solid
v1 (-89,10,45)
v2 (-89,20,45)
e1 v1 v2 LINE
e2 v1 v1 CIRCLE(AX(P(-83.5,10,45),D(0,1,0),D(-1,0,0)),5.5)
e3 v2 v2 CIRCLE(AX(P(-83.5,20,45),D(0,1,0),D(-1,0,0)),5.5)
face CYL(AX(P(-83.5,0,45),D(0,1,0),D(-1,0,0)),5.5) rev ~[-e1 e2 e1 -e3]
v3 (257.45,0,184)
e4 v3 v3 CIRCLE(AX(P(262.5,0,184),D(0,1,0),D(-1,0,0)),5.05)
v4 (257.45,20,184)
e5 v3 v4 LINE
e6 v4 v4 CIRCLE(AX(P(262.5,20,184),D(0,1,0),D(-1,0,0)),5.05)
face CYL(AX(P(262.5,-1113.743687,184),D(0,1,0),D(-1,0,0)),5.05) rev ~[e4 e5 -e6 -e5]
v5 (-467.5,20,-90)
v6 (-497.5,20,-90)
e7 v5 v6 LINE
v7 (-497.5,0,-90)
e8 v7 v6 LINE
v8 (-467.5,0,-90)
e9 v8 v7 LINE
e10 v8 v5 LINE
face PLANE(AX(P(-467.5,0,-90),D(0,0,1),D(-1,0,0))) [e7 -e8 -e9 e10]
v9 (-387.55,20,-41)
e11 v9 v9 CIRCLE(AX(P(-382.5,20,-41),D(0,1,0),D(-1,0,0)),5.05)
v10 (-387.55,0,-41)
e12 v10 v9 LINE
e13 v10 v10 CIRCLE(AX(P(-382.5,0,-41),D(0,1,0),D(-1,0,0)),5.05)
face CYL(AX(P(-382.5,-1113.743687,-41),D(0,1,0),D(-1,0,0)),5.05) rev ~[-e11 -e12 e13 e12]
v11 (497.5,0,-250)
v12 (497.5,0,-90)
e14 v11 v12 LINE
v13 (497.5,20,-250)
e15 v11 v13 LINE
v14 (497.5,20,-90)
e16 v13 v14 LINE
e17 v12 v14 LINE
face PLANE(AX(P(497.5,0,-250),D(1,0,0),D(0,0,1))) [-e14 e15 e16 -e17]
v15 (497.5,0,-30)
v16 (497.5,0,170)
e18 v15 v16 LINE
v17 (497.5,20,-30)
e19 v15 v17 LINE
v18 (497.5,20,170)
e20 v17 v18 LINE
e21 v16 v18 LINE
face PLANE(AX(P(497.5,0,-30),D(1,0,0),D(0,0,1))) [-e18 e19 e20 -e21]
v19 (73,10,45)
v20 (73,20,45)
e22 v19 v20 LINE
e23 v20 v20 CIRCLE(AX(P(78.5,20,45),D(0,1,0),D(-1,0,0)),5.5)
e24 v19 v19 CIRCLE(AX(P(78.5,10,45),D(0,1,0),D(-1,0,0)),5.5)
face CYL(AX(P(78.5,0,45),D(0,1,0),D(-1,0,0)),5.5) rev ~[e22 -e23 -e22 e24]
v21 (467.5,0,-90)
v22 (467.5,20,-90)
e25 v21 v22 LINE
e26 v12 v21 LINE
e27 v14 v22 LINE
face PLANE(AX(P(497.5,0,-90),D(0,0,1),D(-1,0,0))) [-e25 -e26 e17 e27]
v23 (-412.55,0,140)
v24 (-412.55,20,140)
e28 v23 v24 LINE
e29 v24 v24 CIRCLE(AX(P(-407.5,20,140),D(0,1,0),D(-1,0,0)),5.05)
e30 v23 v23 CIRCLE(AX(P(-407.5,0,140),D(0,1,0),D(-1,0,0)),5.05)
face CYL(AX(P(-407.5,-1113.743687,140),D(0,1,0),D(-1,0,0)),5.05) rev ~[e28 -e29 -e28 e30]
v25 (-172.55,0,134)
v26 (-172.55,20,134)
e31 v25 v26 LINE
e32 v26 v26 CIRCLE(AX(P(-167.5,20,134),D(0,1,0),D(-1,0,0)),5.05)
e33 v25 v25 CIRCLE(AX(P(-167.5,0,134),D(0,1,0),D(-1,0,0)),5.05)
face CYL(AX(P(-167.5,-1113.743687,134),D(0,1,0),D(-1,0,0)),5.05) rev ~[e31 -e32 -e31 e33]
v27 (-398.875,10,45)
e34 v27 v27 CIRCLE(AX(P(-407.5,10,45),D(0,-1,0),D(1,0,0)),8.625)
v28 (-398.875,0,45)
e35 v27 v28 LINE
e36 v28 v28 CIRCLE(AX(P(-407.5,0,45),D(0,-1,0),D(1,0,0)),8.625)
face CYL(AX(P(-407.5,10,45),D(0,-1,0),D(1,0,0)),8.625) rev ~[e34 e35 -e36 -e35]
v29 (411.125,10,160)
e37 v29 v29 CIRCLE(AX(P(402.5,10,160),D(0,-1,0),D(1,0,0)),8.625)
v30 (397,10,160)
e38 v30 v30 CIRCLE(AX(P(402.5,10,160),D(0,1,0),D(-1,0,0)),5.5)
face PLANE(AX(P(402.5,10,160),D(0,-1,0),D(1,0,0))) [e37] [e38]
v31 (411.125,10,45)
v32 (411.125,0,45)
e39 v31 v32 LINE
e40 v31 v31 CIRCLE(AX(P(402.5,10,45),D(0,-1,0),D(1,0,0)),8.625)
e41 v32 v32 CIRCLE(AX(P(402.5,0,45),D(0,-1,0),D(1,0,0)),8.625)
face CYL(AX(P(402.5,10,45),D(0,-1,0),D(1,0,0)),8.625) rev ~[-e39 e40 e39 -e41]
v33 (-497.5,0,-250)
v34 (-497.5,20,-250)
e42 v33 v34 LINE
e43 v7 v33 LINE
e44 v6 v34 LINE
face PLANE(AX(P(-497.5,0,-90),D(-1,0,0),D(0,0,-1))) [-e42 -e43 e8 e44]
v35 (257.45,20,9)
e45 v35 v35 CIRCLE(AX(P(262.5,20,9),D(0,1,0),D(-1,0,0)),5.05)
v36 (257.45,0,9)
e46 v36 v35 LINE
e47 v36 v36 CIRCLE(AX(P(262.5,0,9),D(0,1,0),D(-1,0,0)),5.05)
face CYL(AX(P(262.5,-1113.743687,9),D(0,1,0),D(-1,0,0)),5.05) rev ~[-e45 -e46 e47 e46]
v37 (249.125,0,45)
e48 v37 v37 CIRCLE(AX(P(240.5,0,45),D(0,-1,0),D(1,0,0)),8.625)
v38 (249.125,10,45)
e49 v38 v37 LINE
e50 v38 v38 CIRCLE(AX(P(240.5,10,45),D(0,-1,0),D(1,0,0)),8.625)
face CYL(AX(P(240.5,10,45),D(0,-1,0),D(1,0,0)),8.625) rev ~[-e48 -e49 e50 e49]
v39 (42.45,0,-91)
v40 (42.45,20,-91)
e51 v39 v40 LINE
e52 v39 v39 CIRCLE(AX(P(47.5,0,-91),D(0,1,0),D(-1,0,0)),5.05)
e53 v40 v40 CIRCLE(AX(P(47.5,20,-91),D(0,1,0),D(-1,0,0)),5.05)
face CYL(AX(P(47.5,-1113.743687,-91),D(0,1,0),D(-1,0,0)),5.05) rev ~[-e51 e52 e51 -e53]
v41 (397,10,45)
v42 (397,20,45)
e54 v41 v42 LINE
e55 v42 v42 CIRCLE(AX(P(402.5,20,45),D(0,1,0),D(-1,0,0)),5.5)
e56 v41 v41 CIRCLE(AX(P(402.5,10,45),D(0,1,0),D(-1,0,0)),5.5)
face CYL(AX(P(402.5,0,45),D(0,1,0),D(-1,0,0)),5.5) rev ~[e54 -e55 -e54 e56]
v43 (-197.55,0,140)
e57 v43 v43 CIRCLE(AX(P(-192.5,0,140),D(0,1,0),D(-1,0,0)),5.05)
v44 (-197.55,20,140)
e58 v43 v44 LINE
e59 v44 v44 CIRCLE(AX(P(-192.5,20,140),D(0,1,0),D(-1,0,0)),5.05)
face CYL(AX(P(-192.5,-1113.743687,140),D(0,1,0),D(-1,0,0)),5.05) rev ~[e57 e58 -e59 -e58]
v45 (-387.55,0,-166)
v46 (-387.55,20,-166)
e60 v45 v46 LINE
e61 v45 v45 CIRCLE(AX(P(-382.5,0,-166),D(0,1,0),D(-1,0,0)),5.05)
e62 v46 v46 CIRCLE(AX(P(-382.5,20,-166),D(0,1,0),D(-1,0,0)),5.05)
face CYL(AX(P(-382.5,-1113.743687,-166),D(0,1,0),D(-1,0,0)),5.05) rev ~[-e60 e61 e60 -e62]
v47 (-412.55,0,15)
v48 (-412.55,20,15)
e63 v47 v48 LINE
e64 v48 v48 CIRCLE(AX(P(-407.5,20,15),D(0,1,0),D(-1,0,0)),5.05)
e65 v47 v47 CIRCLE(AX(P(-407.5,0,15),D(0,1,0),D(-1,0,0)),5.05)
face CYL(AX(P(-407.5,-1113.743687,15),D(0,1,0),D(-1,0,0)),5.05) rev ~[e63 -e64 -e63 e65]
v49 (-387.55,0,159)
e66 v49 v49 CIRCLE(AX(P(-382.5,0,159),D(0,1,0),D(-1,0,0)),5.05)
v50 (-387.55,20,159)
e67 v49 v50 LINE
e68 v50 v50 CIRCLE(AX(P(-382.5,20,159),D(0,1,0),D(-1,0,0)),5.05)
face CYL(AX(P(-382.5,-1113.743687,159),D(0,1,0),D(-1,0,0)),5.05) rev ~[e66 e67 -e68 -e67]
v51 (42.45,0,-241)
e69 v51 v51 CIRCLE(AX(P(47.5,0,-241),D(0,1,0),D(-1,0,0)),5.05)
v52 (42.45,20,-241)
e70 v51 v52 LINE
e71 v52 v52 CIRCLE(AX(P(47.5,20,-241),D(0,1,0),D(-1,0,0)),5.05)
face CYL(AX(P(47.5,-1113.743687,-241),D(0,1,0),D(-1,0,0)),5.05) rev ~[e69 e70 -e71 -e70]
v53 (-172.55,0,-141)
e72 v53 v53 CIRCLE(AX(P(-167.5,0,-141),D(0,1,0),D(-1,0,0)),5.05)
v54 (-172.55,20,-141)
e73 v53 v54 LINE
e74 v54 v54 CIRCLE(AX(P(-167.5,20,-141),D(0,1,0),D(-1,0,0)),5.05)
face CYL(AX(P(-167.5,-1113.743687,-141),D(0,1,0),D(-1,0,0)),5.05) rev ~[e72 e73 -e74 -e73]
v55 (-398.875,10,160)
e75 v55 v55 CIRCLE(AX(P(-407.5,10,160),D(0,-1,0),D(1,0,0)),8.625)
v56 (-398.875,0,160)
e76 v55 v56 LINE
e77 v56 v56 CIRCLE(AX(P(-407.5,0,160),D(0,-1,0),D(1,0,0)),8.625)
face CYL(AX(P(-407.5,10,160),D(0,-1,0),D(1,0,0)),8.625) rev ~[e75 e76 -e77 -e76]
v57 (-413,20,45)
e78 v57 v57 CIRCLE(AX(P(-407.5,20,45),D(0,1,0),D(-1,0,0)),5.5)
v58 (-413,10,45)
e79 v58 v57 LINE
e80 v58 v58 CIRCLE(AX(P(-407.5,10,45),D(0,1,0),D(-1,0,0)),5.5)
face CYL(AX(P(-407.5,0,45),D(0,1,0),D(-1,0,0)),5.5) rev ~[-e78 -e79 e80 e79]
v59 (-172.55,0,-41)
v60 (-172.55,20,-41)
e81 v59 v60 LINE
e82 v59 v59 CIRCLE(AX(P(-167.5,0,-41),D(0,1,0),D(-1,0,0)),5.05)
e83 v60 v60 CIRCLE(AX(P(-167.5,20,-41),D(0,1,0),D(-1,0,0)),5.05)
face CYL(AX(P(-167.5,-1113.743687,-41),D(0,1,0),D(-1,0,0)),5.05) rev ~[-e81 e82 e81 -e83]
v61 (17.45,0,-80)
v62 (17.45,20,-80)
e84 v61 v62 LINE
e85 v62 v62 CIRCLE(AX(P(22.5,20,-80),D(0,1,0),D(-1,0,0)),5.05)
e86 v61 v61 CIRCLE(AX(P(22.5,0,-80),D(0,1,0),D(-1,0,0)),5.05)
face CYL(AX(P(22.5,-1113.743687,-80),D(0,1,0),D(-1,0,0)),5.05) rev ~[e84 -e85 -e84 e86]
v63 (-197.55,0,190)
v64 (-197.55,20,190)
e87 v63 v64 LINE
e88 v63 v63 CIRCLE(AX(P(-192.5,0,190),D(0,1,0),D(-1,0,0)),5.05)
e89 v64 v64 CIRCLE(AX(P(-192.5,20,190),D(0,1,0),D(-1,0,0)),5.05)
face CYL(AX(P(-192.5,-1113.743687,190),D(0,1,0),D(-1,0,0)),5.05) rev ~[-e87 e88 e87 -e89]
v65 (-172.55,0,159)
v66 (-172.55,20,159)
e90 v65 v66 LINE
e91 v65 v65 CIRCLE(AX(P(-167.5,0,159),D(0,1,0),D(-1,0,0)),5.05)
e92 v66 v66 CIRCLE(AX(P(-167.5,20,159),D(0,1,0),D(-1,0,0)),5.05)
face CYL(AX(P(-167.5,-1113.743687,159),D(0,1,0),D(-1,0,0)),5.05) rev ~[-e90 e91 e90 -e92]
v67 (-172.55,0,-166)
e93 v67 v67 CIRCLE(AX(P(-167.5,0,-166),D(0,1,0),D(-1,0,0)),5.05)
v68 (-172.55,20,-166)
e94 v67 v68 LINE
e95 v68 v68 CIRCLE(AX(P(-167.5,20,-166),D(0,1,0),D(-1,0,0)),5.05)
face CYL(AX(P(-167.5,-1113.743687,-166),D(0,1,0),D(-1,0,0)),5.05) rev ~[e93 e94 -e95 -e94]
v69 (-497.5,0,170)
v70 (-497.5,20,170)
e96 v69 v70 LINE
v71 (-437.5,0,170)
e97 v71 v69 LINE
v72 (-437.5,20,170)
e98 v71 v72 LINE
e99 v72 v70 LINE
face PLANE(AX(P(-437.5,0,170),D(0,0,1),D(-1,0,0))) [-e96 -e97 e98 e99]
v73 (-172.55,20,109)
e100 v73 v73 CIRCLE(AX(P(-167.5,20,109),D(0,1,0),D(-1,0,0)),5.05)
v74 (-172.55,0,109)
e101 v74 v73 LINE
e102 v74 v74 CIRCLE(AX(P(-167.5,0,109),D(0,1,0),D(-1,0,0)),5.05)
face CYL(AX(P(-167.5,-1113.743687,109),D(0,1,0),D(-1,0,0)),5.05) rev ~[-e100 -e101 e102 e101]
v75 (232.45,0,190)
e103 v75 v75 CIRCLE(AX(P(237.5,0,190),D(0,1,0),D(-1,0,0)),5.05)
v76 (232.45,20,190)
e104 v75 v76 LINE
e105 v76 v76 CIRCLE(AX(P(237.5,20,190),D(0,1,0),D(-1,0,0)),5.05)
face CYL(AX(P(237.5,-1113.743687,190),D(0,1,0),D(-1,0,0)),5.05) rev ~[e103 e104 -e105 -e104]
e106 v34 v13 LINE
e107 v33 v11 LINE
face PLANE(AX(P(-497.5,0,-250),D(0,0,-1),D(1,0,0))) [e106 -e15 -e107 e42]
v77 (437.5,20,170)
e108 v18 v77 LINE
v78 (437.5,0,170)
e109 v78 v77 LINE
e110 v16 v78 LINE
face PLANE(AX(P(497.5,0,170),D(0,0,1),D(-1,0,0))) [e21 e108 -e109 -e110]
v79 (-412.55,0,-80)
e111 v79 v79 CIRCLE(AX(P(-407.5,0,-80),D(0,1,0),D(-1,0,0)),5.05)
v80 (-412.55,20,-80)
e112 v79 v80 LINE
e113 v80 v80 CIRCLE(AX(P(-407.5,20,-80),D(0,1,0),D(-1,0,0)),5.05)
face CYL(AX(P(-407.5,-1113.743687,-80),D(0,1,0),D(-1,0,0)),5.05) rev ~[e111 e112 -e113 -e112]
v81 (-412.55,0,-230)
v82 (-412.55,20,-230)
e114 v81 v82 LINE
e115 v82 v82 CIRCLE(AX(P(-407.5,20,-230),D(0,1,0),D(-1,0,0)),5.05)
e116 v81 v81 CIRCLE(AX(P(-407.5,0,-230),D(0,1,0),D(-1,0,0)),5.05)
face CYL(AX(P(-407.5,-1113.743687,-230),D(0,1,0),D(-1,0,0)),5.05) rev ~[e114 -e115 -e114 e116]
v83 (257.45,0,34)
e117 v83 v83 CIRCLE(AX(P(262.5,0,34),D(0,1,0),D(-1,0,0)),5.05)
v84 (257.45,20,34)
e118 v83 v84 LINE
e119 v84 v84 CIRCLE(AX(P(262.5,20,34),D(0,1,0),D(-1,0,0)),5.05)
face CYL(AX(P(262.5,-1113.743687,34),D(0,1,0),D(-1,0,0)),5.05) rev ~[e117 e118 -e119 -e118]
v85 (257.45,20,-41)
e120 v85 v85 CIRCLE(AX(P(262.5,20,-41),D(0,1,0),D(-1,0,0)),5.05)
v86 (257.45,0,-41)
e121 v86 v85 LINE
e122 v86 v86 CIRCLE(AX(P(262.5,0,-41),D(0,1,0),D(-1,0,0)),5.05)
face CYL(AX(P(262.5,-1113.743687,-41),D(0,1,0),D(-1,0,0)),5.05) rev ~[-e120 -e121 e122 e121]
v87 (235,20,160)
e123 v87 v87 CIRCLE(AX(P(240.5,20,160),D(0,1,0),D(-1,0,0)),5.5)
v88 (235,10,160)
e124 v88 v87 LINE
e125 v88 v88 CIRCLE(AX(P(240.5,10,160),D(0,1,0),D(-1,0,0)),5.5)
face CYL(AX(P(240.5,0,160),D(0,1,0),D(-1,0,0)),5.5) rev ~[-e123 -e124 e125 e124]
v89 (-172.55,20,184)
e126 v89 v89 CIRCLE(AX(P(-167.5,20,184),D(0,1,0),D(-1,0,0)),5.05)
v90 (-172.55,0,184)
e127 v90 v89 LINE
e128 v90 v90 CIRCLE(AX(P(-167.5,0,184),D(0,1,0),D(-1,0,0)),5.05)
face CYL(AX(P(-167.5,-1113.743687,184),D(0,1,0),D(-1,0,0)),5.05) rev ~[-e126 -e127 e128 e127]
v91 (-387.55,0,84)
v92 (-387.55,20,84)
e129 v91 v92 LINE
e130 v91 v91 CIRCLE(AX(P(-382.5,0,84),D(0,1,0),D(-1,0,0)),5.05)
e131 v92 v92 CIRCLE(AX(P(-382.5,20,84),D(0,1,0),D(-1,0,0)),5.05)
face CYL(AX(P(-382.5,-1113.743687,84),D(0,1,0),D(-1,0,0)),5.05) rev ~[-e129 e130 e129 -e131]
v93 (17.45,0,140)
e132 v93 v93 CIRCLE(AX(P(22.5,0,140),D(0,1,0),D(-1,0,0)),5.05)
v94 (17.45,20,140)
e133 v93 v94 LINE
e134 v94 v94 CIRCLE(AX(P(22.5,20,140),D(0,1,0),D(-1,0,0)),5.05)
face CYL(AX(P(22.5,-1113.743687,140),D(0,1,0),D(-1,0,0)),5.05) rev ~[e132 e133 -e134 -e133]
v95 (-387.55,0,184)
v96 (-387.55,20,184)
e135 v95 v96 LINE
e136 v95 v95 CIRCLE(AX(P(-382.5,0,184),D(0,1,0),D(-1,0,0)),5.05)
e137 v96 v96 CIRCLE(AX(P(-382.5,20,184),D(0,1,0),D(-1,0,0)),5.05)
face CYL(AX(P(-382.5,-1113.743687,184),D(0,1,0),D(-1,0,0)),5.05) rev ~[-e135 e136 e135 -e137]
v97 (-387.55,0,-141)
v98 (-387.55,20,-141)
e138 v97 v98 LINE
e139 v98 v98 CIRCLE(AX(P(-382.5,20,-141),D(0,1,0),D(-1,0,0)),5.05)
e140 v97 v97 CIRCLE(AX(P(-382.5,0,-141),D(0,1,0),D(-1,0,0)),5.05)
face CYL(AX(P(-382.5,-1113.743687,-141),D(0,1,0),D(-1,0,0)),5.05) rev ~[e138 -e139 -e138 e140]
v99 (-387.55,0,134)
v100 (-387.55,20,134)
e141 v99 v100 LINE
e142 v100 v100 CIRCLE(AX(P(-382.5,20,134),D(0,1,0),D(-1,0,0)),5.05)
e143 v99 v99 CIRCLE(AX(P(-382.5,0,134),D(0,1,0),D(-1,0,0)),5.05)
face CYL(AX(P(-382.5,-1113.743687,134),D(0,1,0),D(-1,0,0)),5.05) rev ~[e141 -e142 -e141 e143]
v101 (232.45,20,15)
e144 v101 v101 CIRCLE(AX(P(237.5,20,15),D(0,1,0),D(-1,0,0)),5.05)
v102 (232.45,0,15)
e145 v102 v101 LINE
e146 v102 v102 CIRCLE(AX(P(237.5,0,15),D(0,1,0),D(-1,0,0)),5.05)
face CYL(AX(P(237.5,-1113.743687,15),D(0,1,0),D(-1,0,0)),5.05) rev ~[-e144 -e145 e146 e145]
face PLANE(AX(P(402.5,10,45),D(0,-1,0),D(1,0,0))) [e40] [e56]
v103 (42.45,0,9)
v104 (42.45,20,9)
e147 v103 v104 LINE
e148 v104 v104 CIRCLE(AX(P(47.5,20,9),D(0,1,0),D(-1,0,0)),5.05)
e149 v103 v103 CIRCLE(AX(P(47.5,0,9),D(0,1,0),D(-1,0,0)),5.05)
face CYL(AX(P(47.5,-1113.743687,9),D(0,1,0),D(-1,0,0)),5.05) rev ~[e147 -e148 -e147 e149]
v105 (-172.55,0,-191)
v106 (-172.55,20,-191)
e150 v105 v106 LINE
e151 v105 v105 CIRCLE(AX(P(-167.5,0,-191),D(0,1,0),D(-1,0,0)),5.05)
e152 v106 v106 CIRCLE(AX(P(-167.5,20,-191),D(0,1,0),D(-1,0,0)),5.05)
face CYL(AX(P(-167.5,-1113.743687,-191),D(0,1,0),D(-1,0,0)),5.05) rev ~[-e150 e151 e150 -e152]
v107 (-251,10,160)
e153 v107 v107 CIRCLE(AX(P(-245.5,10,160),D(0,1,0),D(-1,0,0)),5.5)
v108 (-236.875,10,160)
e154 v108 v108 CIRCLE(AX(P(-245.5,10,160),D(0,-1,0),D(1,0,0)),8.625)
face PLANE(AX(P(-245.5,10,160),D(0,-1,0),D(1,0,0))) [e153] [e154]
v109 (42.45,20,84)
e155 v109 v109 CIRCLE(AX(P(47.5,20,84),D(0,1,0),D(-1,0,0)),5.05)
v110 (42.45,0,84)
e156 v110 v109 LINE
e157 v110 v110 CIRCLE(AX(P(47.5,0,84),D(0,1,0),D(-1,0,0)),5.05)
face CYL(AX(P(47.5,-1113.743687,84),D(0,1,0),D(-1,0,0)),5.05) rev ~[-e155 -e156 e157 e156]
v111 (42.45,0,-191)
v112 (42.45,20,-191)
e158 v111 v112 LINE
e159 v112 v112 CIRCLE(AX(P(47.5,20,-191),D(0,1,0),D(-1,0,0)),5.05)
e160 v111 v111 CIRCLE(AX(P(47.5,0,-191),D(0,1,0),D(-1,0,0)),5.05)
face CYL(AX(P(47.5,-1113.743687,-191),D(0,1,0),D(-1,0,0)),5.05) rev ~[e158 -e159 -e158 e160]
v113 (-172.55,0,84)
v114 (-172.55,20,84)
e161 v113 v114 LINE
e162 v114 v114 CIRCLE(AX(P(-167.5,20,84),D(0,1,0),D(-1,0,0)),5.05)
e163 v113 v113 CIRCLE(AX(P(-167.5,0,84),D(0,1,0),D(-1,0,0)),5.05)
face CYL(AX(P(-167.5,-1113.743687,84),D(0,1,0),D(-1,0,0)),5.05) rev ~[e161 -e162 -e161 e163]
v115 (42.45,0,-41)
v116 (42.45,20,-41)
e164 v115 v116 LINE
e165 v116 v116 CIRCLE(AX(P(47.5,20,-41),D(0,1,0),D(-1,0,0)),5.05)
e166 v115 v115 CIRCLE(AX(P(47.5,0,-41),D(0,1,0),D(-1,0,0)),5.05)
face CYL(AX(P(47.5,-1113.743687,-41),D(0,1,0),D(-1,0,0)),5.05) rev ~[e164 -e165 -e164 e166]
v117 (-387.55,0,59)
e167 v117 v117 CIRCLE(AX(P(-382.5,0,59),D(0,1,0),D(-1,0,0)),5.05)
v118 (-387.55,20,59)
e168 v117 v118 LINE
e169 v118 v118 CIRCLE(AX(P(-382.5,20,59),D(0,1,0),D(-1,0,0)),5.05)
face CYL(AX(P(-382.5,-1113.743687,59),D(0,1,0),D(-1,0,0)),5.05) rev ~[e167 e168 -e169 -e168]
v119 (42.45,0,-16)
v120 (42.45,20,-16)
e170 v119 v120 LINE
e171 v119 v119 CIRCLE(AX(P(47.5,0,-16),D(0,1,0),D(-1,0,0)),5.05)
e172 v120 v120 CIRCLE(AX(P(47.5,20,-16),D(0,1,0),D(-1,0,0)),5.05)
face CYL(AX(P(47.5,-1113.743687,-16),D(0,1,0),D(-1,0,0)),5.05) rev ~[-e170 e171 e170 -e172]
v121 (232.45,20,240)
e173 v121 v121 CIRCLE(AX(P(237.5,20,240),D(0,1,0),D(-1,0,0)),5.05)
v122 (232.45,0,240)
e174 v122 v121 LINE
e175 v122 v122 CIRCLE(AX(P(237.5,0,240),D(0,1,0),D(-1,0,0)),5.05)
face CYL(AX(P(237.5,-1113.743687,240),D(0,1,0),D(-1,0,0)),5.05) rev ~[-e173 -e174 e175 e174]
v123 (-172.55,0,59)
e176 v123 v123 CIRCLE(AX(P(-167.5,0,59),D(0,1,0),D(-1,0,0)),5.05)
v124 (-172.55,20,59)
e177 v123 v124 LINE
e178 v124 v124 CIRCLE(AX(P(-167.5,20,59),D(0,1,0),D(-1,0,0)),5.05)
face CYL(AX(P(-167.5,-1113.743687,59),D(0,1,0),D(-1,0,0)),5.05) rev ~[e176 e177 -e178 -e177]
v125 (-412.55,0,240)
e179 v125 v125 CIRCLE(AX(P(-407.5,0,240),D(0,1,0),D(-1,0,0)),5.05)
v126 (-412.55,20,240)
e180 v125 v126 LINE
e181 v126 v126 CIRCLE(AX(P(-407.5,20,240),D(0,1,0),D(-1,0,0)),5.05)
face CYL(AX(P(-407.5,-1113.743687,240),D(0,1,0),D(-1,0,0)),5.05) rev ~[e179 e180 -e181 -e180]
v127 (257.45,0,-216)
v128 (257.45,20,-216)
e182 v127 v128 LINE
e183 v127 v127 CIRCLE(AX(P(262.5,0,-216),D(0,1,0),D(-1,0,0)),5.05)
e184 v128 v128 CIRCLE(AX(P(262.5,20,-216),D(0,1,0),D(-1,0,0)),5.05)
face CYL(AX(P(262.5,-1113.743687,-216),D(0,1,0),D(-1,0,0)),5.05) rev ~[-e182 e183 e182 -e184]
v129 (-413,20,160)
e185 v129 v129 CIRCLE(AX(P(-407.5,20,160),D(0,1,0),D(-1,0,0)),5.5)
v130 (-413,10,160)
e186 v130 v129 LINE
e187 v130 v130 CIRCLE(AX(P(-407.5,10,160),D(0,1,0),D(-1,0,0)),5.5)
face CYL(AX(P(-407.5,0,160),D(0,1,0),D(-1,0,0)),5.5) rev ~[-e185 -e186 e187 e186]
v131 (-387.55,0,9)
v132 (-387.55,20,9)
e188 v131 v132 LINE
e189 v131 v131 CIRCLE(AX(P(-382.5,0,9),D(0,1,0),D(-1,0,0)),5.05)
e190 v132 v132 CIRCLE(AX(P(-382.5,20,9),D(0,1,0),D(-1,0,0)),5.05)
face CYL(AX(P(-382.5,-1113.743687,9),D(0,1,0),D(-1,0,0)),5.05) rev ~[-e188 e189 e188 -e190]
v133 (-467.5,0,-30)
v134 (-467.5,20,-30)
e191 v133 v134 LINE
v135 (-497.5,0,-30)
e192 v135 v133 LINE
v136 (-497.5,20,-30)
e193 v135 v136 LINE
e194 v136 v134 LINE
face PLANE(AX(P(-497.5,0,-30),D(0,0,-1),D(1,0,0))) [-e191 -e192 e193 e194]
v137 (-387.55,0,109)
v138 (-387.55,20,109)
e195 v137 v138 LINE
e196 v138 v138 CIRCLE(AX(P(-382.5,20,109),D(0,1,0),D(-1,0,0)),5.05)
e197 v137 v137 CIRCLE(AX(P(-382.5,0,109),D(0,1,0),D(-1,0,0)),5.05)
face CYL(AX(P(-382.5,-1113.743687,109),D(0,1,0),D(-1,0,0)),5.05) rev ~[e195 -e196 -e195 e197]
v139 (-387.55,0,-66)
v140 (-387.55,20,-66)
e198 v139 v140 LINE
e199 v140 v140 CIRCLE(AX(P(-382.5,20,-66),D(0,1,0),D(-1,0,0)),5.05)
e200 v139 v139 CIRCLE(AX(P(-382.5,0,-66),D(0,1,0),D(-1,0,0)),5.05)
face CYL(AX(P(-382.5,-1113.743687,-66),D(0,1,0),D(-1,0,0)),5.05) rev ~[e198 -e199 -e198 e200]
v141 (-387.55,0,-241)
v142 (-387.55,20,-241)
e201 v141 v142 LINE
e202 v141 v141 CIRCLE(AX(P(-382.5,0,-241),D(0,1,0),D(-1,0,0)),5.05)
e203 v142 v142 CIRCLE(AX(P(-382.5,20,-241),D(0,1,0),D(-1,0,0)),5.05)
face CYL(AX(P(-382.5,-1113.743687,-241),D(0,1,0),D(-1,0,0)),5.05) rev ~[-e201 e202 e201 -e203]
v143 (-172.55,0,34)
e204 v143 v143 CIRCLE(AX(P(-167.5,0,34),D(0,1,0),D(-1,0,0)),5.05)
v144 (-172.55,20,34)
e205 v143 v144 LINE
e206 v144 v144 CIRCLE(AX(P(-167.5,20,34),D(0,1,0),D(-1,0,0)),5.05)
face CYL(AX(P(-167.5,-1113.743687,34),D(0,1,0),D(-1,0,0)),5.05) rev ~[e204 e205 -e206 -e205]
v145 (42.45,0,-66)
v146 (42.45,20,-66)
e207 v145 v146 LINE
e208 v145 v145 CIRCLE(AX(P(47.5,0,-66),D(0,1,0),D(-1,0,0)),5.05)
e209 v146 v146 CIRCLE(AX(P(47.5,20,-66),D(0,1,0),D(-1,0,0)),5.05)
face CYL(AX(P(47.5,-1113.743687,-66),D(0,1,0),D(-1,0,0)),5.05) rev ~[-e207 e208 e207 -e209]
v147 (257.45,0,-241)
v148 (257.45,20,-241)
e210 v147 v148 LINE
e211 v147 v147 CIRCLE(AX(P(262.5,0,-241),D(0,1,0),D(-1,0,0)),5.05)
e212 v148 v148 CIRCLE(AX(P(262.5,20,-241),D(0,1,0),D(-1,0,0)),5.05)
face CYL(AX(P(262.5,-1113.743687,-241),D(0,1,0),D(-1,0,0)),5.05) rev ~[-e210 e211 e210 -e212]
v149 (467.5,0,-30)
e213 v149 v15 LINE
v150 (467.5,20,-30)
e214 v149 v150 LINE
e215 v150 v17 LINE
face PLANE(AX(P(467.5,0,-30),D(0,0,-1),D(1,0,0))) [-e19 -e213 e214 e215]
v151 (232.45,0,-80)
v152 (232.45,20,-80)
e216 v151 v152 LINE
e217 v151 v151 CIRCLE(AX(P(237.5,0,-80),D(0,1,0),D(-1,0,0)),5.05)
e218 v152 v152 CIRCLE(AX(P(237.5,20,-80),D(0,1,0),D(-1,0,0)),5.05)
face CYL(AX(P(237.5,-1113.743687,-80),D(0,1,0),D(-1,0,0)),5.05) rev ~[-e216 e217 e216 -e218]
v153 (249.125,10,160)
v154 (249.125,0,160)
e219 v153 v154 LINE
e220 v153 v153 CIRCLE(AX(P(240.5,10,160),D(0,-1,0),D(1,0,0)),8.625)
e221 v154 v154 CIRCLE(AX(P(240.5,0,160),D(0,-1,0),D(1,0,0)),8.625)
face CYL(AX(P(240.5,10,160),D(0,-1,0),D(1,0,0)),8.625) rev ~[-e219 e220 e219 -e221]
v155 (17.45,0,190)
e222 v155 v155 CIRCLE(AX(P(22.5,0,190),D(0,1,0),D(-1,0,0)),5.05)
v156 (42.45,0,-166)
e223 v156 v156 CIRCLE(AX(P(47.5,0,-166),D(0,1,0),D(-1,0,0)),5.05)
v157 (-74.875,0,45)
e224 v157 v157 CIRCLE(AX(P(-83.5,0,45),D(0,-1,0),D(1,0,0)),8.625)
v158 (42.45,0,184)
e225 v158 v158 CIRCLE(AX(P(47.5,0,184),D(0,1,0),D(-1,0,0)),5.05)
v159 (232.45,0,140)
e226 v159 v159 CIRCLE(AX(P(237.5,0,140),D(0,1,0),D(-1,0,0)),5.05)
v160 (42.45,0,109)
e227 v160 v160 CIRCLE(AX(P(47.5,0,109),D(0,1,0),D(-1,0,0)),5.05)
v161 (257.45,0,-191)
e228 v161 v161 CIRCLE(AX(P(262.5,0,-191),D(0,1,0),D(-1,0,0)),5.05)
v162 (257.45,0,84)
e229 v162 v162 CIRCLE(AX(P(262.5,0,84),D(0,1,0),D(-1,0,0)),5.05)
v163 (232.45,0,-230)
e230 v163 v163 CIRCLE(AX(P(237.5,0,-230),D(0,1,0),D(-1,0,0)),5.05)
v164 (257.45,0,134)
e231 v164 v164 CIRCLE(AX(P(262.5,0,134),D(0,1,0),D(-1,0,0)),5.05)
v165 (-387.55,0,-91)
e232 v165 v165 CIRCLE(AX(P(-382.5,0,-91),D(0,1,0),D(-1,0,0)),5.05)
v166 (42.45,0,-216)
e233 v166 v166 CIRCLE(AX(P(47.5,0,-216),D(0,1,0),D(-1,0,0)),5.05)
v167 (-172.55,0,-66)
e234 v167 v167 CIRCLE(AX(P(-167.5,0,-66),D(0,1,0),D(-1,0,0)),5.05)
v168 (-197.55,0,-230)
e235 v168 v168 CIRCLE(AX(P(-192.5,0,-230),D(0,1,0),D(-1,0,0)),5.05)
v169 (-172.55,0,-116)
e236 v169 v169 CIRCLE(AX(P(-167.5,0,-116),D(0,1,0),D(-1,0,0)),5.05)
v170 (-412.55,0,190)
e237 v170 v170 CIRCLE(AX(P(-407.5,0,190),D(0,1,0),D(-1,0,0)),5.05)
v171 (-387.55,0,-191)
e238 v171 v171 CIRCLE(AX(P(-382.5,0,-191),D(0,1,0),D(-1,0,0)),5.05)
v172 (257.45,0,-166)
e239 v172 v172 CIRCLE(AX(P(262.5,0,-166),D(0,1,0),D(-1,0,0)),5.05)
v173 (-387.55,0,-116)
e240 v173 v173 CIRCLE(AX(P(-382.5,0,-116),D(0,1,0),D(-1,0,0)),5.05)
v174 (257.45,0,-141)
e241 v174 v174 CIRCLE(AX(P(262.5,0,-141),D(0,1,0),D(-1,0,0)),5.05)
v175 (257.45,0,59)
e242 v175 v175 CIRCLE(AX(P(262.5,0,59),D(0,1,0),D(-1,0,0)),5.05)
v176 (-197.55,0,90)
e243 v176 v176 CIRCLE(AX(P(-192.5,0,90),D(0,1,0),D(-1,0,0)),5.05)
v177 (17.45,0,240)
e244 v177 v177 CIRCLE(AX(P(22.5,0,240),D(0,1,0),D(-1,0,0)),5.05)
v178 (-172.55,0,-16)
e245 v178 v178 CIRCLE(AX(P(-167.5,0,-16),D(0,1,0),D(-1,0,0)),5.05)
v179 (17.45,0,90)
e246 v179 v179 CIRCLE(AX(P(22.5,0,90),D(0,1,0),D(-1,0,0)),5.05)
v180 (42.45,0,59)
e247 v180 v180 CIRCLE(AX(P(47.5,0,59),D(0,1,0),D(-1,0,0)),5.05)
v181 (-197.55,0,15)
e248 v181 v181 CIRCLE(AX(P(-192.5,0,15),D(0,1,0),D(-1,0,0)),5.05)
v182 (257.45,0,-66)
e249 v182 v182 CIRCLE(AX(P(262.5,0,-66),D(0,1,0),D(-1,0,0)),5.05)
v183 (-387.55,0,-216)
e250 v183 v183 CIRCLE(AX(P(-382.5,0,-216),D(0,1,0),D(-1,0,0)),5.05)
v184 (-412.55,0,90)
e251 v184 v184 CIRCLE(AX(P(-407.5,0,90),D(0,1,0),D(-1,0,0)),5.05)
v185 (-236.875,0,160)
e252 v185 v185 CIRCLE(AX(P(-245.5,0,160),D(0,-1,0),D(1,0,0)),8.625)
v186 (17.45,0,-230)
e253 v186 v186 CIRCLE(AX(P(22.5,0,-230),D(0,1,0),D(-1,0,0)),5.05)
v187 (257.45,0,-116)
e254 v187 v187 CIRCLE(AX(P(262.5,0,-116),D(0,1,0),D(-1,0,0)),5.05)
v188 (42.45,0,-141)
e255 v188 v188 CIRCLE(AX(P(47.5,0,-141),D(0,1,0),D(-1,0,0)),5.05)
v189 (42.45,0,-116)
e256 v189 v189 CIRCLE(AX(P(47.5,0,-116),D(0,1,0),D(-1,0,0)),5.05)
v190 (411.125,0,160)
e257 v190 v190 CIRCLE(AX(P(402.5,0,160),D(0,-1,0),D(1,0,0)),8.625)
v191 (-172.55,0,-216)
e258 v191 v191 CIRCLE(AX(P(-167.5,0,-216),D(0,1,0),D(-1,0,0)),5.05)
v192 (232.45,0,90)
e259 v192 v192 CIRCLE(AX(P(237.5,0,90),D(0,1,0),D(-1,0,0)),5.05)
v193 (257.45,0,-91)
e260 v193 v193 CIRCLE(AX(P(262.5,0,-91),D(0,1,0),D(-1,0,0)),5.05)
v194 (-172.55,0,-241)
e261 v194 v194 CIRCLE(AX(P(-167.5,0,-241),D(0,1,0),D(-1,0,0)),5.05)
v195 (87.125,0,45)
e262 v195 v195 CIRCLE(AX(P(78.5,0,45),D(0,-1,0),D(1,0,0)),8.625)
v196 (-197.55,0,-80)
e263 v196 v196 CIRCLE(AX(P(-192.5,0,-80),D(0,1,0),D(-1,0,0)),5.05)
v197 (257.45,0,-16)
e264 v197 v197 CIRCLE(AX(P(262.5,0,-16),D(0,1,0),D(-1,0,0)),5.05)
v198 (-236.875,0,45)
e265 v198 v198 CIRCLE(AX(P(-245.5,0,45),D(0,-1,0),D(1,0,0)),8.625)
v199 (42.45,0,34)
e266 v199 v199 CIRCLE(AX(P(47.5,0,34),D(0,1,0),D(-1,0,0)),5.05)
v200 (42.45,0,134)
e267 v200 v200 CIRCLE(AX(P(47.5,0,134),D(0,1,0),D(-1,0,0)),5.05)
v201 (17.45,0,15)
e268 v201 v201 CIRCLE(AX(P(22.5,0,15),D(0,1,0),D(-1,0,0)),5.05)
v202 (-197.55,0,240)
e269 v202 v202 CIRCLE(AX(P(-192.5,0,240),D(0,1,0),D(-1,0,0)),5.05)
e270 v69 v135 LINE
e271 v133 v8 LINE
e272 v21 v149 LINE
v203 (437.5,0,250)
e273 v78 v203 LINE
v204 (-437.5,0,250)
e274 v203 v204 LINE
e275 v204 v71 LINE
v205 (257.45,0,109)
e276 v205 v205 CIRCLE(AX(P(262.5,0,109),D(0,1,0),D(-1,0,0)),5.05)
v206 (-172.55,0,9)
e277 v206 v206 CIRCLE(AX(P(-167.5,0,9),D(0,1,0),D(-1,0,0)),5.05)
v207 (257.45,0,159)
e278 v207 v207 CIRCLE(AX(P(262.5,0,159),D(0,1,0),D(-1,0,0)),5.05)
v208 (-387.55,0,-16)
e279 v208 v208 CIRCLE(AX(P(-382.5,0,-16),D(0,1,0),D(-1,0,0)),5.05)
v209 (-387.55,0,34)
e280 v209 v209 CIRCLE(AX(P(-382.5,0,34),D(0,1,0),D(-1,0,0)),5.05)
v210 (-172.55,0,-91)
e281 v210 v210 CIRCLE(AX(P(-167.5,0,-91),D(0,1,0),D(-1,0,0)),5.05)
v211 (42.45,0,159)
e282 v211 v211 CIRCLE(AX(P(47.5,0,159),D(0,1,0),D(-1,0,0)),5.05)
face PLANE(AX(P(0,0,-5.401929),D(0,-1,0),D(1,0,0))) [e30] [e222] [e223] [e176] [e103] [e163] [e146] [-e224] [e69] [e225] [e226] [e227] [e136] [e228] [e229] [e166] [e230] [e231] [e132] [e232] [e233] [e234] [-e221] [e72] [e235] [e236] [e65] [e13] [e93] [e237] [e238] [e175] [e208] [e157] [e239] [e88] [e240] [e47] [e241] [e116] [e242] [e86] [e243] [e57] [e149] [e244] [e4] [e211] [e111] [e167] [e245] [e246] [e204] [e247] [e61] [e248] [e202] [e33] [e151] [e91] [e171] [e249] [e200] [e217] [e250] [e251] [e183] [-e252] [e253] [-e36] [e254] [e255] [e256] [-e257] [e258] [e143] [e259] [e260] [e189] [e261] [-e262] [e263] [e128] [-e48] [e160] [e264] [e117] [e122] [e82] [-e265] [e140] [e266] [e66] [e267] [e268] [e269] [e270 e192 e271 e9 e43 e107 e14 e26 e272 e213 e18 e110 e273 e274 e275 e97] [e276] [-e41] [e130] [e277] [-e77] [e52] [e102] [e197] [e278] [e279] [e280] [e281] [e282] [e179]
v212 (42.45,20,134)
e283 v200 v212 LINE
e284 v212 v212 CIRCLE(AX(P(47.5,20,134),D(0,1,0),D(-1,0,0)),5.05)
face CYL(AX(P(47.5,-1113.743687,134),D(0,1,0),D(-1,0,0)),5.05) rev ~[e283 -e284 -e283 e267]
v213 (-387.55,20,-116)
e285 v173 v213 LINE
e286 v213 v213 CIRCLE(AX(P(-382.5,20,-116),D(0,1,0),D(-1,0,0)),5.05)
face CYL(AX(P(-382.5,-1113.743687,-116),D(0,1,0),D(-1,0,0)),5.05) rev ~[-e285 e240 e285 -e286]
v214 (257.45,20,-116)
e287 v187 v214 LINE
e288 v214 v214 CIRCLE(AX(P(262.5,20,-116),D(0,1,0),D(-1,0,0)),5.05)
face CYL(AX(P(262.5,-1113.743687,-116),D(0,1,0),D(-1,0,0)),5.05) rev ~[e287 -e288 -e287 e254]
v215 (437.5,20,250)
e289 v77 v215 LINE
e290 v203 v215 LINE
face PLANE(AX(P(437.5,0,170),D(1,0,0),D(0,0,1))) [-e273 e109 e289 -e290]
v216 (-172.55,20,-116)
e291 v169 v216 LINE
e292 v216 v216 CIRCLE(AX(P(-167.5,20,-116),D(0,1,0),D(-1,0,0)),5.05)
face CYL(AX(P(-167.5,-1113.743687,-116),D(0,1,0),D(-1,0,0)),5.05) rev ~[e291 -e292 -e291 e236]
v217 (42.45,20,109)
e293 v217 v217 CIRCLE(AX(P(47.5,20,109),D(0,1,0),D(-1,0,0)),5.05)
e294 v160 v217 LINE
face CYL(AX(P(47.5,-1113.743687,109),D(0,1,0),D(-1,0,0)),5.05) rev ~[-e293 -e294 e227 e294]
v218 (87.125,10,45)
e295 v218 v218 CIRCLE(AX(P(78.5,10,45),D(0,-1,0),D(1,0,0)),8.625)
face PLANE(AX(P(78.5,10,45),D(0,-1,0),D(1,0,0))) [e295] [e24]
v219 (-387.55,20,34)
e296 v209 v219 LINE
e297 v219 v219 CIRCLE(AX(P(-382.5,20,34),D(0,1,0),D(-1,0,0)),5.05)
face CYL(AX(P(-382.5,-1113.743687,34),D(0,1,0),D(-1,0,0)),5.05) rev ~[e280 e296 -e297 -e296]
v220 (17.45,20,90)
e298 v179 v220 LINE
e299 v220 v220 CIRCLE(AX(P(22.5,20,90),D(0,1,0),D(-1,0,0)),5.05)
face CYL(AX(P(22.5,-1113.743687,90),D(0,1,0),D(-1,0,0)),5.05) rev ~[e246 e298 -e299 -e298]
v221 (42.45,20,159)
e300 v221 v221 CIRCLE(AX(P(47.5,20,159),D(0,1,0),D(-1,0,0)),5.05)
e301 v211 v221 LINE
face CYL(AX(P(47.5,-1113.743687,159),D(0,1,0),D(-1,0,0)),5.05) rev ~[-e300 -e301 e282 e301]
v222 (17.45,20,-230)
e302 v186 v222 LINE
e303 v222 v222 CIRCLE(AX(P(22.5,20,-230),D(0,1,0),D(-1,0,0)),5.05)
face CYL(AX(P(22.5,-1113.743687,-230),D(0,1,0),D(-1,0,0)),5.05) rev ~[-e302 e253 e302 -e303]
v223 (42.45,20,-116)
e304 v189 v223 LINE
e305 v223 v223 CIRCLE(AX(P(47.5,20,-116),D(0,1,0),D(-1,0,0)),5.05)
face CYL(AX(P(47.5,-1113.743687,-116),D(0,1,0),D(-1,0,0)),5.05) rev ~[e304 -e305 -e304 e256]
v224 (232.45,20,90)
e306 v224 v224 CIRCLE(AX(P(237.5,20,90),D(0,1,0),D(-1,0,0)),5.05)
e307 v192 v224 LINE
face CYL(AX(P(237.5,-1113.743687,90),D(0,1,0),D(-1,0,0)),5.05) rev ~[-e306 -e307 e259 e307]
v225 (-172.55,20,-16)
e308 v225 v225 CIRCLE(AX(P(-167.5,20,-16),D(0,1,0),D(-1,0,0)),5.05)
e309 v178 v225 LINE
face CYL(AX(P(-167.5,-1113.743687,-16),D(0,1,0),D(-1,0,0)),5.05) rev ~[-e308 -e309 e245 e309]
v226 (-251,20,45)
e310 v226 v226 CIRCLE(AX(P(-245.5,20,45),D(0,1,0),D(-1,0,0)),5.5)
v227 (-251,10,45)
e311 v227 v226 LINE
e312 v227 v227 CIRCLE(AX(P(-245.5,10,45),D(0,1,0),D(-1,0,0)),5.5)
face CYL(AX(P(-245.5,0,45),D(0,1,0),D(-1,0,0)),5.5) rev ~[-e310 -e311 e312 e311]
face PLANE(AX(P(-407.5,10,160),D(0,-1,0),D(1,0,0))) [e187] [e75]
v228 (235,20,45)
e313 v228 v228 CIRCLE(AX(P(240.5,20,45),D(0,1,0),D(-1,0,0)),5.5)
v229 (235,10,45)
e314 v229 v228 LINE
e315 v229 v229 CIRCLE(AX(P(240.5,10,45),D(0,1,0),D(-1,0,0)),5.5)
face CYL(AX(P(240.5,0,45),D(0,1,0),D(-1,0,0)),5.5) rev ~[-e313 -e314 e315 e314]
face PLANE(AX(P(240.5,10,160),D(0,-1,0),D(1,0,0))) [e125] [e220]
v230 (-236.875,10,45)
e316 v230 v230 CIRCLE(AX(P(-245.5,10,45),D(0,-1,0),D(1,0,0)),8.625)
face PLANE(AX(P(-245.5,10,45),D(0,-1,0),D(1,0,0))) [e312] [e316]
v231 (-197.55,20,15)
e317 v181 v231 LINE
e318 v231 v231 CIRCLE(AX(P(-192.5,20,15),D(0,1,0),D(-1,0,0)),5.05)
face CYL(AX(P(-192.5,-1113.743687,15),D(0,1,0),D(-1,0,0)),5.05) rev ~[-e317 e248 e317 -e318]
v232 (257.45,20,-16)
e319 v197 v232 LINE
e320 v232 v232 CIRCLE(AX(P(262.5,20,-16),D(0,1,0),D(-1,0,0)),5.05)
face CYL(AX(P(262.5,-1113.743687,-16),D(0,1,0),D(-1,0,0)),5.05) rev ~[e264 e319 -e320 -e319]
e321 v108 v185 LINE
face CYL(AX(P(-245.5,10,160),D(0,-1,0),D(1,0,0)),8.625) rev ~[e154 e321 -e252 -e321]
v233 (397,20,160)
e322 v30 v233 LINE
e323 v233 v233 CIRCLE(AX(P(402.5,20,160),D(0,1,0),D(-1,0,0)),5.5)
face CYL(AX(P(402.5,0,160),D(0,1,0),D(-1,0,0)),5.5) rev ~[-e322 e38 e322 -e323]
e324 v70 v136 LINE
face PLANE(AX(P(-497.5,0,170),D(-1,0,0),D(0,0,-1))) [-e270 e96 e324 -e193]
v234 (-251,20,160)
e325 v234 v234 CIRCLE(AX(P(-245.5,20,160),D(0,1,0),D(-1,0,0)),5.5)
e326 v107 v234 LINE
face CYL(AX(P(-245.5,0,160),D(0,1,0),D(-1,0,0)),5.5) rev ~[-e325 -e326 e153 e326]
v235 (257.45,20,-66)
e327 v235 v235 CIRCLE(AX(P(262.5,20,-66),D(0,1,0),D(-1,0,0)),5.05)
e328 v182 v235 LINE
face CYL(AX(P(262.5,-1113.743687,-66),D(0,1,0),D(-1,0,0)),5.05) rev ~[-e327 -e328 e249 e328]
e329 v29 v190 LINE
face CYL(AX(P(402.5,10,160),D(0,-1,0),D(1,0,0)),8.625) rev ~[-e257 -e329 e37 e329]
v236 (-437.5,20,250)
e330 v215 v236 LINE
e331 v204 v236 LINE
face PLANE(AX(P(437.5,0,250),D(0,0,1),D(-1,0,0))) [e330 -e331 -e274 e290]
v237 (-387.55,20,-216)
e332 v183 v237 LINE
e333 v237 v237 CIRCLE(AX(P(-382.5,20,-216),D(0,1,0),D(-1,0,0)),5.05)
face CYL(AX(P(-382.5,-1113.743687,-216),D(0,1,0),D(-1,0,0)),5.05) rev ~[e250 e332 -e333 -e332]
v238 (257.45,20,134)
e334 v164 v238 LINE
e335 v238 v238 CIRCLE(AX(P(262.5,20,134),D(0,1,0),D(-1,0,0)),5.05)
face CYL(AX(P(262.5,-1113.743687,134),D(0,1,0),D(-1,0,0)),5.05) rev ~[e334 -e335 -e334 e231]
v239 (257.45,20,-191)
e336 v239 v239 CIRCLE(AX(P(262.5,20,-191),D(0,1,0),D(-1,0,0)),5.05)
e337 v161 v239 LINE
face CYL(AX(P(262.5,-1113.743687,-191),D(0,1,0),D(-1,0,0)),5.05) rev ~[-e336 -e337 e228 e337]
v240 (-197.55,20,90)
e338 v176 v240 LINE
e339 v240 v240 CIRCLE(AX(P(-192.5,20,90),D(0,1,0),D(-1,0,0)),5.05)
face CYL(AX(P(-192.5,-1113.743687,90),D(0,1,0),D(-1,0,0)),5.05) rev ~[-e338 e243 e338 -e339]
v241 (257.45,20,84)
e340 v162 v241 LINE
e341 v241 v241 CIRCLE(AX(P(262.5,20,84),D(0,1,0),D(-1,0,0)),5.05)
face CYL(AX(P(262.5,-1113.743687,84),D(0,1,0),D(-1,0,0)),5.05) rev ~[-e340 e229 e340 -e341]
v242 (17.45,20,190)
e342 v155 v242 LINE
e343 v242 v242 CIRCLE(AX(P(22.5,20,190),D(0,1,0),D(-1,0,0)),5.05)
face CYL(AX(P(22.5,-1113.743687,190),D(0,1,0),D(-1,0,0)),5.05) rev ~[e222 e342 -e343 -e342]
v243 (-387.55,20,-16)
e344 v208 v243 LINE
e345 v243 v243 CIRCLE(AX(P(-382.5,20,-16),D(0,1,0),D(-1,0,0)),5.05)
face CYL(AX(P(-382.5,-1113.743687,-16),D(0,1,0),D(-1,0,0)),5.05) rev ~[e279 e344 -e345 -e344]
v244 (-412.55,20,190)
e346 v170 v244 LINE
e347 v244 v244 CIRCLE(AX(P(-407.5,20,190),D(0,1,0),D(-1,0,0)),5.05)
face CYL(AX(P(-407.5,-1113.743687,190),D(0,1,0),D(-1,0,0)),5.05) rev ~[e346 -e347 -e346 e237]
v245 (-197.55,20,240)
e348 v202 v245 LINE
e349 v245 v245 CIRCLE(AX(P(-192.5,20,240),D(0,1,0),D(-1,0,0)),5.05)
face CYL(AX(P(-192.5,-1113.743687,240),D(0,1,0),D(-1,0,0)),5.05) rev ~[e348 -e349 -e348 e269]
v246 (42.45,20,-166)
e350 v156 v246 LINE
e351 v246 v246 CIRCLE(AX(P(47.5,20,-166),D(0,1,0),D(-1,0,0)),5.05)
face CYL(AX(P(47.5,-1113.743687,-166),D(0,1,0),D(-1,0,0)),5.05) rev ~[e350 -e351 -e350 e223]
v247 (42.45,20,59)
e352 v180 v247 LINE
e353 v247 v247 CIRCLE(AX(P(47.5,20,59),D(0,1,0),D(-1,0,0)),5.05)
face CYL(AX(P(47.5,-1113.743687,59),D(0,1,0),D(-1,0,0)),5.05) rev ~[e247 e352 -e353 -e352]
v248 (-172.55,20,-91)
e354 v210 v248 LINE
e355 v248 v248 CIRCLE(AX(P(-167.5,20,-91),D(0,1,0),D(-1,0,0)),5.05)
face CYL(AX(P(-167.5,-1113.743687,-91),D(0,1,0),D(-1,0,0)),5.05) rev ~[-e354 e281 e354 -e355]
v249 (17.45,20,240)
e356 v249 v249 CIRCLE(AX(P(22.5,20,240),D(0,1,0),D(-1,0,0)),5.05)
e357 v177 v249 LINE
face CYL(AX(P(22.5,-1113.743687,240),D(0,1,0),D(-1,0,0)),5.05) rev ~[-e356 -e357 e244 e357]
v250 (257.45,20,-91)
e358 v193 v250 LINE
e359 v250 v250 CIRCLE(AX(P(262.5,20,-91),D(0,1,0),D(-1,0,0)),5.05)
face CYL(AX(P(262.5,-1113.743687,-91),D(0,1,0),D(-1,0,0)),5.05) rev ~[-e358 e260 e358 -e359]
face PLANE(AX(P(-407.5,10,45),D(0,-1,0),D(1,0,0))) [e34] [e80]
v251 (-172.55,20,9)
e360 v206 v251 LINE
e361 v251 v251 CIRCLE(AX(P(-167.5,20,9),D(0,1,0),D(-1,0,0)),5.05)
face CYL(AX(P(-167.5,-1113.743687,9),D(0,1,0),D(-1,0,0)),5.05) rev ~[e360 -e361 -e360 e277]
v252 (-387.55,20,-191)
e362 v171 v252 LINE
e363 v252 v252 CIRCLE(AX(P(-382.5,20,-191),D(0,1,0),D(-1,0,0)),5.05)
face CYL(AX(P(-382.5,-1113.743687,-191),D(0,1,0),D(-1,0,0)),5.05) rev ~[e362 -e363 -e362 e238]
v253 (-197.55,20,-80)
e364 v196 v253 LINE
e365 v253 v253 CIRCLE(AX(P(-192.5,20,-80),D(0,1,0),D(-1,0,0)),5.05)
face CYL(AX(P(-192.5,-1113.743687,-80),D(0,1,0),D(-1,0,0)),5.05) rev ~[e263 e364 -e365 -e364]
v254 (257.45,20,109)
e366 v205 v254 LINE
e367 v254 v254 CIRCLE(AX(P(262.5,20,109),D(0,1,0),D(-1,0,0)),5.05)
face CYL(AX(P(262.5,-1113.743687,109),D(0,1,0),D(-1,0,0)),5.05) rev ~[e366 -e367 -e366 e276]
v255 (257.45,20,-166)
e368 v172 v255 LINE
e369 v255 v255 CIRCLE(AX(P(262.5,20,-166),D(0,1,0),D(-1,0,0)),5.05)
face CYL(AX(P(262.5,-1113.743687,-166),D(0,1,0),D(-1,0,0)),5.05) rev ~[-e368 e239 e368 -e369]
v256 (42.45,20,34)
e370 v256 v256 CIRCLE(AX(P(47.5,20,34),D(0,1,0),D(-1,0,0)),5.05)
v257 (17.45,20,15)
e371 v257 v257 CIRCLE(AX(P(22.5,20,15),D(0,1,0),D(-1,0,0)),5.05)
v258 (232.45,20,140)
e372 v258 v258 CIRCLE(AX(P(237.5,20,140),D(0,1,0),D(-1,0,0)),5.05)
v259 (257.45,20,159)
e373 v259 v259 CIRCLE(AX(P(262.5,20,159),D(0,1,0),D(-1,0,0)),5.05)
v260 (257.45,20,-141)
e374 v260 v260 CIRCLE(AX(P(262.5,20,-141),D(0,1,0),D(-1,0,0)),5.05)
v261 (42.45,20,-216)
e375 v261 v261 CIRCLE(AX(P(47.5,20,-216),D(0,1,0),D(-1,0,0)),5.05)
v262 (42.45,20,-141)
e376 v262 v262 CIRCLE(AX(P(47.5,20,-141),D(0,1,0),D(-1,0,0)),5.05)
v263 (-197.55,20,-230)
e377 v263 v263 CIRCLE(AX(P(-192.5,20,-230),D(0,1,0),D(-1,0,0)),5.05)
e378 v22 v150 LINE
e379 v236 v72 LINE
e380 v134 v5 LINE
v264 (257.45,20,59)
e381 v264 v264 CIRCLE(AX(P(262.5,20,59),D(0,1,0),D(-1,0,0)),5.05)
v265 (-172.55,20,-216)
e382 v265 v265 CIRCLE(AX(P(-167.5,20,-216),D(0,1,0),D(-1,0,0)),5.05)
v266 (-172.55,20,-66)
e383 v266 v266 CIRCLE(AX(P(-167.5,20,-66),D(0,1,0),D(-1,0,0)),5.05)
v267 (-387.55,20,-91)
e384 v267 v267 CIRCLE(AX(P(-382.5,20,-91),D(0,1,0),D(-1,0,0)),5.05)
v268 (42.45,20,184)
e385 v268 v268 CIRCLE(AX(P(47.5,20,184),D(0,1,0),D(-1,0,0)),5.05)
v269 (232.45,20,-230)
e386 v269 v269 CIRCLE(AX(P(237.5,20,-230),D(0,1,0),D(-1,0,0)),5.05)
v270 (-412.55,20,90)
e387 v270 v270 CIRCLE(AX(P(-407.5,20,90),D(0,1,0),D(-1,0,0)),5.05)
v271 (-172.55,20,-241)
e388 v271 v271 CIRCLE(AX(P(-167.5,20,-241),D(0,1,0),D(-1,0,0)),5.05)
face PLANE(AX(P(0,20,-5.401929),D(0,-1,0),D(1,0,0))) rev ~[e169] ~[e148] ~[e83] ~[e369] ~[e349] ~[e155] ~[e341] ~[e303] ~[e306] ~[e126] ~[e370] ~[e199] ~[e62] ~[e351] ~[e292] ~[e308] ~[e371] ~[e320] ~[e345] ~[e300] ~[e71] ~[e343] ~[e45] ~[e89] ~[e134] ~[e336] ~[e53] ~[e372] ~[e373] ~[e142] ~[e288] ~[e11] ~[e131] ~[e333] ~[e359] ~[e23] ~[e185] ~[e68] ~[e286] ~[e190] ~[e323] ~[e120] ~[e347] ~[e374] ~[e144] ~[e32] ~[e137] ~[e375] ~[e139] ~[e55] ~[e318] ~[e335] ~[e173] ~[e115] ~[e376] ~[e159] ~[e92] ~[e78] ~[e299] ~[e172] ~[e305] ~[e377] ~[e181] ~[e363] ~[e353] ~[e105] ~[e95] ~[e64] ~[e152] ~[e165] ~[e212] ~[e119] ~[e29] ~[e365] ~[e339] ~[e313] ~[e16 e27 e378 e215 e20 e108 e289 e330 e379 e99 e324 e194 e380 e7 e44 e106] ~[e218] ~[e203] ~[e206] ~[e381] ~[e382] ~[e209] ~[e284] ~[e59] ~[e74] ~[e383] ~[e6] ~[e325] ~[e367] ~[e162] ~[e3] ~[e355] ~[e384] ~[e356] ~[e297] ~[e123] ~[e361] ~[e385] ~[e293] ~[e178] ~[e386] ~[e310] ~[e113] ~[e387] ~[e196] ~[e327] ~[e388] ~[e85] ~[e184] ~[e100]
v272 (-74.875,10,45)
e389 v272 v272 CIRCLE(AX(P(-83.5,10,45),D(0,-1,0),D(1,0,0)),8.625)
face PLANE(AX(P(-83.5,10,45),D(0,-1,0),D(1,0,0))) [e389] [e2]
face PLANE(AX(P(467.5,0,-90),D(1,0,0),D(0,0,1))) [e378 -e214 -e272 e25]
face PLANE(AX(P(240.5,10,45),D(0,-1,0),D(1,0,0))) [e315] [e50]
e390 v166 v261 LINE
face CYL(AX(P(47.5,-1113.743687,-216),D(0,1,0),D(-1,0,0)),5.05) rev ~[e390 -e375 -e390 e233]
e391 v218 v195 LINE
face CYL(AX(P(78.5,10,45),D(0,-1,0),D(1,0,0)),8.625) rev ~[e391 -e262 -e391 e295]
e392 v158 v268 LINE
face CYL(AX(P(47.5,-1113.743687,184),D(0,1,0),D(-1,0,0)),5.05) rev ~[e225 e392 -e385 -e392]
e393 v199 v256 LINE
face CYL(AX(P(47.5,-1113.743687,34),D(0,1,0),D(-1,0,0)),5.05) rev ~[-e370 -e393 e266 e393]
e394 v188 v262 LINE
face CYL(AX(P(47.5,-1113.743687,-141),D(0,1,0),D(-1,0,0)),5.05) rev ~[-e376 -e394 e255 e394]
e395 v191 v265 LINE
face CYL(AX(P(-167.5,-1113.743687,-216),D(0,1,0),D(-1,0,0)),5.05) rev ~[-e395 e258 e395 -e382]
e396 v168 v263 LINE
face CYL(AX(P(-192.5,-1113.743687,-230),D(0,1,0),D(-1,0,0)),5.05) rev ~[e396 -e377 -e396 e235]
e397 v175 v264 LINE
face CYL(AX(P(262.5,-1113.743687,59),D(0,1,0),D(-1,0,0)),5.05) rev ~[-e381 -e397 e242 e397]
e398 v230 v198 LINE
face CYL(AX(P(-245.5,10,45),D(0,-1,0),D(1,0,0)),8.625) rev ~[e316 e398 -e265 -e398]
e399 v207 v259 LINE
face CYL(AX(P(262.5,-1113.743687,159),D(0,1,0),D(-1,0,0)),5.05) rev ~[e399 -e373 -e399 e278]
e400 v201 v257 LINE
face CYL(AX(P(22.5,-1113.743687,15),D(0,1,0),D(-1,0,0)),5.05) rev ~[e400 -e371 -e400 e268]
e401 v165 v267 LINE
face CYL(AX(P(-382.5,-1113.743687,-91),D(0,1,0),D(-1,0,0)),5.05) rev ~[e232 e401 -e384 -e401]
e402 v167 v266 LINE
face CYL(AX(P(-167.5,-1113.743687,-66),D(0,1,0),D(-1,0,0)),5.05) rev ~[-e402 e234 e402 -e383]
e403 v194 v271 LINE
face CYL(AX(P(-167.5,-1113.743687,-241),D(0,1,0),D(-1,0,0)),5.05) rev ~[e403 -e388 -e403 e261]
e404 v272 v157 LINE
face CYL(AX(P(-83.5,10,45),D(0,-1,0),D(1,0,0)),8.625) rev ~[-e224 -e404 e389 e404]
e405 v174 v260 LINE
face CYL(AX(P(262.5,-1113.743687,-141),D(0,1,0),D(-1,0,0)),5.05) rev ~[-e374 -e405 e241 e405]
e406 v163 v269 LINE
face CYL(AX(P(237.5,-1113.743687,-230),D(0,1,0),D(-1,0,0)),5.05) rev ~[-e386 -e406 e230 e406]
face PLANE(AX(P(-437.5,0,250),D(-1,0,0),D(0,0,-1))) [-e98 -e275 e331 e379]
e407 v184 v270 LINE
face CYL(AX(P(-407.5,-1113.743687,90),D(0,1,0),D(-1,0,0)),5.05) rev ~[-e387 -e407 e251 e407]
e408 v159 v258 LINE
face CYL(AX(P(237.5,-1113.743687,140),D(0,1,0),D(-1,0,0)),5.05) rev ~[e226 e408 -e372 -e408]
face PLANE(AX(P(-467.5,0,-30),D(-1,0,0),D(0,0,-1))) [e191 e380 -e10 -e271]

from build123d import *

# Parameters (mm, degrees)
F1_DEPTH       = 20
F3_D           = 11
F3_DEPTH       = 35
F3_CBORE_D     = 17.25
F3_CBORE_DEPTH = 10
F3_TIP         = 3.3047334047
F5_D           = 10.1
F7_D           = 10.1


# Not quite as in the source:
# - a feature names something its author has since deleted; it is built from what else it names


with BuildPart() as f1:
    # F0 (on Front) → F1 (new body)
    with BuildSketch(Plane.XZ):
        Polygon((-497.5, -250), (497.5, -250), (497.5, -90), (467.5, -90), (467.5, -30), (497.5, -30), (497.5, 170), (437.5, 170), (437.5, 250), (-437.5, 250), (-437.5, 170), (-497.5, 170), (-497.5, -30), (-467.5, -30), (-467.5, -90), (-497.5, -90), align=None)
    extrude(amount=-F1_DEPTH)

    # F3
    with Locations(Plane.XZ):
        with Locations((-83.5, 45), (-407.5, 160), (78.5, 45), (-407.5, 45), (240.5, 160), (-245.5, 160), (402.5, 45), (240.5, 45), (-245.5, 45), (402.5, 160)):
            CounterBoreHole(F3_D / 2, F3_CBORE_D / 2, F3_CBORE_DEPTH, depth=F3_DEPTH)
            with Locations((0, 0, -(F3_DEPTH + F3_TIP / 2))):  # 118° drill point
                Cone(0, F3_D / 2, F3_TIP, mode=Mode.SUBTRACT)

    # F5 (through all)
    with Locations(Plane.XZ):
        with Locations((-407.5, -80), (-407.5, 15), (-407.5, -230), (-407.5, 90), (-407.5, 240), (-407.5, 140), (-407.5, 190), (22.5, 190), (-192.5, 190), (237.5, 90), (-192.5, 15), (237.5, -80), (-192.5, -80), (-192.5, -230), (237.5, -230), (237.5, 190), (-192.5, 140), (22.5, -80), (22.5, 140), (-192.5, 240), (22.5, -230), (-192.5, 90), (237.5, 140), (237.5, 15), (237.5, 240), (22.5, 240), (22.5, 15), (22.5, 90)):
            Hole(F5_D / 2)

    # F7 (through all)
    with Locations(Plane.XZ):
        with Locations((47.5, -116), (262.5, -91), (-382.5, -166), (-167.5, -141), (-167.5, -16), (47.5, 9), (262.5, 9), (-167.5, -41), (47.5, -16), (-167.5, 34), (47.5, 59), (262.5, 59), (-167.5, 9), (47.5, 34), (262.5, 34), (-167.5, 84), (47.5, 109), (262.5, 109), (-167.5, 59), (47.5, 84), (262.5, 84), (262.5, 159), (-382.5, 59), (-167.5, 109), (47.5, 134), (262.5, 134), (-382.5, 84), (-382.5, 9), (-382.5, 34), (-382.5, -41), (-382.5, -16), (-382.5, -66), (-382.5, 159), (-382.5, 184), (-382.5, 109), (-382.5, 134), (47.5, -66), (-382.5, -141), (262.5, 184), (262.5, -41), (262.5, -216), (-167.5, 134), (-167.5, -91), (47.5, 159), (47.5, -91), (-382.5, -116), (47.5, -191), (262.5, -66), (262.5, -166), (-167.5, 184), (-167.5, -116), (-167.5, -216), (47.5, -41), (-382.5, -91), (47.5, -216), (262.5, -191), (262.5, -16), (-167.5, 159), (-167.5, -66), (47.5, 184), (47.5, -141), (262.5, -116), (-382.5, -191), (-167.5, -166), (47.5, -166), (262.5, -141), (-382.5, -216), (-167.5, -191), (-382.5, -241), (-167.5, -241), (47.5, -241), (262.5, -241)):
            Hole(F7_D / 2)


solid = f1.part
